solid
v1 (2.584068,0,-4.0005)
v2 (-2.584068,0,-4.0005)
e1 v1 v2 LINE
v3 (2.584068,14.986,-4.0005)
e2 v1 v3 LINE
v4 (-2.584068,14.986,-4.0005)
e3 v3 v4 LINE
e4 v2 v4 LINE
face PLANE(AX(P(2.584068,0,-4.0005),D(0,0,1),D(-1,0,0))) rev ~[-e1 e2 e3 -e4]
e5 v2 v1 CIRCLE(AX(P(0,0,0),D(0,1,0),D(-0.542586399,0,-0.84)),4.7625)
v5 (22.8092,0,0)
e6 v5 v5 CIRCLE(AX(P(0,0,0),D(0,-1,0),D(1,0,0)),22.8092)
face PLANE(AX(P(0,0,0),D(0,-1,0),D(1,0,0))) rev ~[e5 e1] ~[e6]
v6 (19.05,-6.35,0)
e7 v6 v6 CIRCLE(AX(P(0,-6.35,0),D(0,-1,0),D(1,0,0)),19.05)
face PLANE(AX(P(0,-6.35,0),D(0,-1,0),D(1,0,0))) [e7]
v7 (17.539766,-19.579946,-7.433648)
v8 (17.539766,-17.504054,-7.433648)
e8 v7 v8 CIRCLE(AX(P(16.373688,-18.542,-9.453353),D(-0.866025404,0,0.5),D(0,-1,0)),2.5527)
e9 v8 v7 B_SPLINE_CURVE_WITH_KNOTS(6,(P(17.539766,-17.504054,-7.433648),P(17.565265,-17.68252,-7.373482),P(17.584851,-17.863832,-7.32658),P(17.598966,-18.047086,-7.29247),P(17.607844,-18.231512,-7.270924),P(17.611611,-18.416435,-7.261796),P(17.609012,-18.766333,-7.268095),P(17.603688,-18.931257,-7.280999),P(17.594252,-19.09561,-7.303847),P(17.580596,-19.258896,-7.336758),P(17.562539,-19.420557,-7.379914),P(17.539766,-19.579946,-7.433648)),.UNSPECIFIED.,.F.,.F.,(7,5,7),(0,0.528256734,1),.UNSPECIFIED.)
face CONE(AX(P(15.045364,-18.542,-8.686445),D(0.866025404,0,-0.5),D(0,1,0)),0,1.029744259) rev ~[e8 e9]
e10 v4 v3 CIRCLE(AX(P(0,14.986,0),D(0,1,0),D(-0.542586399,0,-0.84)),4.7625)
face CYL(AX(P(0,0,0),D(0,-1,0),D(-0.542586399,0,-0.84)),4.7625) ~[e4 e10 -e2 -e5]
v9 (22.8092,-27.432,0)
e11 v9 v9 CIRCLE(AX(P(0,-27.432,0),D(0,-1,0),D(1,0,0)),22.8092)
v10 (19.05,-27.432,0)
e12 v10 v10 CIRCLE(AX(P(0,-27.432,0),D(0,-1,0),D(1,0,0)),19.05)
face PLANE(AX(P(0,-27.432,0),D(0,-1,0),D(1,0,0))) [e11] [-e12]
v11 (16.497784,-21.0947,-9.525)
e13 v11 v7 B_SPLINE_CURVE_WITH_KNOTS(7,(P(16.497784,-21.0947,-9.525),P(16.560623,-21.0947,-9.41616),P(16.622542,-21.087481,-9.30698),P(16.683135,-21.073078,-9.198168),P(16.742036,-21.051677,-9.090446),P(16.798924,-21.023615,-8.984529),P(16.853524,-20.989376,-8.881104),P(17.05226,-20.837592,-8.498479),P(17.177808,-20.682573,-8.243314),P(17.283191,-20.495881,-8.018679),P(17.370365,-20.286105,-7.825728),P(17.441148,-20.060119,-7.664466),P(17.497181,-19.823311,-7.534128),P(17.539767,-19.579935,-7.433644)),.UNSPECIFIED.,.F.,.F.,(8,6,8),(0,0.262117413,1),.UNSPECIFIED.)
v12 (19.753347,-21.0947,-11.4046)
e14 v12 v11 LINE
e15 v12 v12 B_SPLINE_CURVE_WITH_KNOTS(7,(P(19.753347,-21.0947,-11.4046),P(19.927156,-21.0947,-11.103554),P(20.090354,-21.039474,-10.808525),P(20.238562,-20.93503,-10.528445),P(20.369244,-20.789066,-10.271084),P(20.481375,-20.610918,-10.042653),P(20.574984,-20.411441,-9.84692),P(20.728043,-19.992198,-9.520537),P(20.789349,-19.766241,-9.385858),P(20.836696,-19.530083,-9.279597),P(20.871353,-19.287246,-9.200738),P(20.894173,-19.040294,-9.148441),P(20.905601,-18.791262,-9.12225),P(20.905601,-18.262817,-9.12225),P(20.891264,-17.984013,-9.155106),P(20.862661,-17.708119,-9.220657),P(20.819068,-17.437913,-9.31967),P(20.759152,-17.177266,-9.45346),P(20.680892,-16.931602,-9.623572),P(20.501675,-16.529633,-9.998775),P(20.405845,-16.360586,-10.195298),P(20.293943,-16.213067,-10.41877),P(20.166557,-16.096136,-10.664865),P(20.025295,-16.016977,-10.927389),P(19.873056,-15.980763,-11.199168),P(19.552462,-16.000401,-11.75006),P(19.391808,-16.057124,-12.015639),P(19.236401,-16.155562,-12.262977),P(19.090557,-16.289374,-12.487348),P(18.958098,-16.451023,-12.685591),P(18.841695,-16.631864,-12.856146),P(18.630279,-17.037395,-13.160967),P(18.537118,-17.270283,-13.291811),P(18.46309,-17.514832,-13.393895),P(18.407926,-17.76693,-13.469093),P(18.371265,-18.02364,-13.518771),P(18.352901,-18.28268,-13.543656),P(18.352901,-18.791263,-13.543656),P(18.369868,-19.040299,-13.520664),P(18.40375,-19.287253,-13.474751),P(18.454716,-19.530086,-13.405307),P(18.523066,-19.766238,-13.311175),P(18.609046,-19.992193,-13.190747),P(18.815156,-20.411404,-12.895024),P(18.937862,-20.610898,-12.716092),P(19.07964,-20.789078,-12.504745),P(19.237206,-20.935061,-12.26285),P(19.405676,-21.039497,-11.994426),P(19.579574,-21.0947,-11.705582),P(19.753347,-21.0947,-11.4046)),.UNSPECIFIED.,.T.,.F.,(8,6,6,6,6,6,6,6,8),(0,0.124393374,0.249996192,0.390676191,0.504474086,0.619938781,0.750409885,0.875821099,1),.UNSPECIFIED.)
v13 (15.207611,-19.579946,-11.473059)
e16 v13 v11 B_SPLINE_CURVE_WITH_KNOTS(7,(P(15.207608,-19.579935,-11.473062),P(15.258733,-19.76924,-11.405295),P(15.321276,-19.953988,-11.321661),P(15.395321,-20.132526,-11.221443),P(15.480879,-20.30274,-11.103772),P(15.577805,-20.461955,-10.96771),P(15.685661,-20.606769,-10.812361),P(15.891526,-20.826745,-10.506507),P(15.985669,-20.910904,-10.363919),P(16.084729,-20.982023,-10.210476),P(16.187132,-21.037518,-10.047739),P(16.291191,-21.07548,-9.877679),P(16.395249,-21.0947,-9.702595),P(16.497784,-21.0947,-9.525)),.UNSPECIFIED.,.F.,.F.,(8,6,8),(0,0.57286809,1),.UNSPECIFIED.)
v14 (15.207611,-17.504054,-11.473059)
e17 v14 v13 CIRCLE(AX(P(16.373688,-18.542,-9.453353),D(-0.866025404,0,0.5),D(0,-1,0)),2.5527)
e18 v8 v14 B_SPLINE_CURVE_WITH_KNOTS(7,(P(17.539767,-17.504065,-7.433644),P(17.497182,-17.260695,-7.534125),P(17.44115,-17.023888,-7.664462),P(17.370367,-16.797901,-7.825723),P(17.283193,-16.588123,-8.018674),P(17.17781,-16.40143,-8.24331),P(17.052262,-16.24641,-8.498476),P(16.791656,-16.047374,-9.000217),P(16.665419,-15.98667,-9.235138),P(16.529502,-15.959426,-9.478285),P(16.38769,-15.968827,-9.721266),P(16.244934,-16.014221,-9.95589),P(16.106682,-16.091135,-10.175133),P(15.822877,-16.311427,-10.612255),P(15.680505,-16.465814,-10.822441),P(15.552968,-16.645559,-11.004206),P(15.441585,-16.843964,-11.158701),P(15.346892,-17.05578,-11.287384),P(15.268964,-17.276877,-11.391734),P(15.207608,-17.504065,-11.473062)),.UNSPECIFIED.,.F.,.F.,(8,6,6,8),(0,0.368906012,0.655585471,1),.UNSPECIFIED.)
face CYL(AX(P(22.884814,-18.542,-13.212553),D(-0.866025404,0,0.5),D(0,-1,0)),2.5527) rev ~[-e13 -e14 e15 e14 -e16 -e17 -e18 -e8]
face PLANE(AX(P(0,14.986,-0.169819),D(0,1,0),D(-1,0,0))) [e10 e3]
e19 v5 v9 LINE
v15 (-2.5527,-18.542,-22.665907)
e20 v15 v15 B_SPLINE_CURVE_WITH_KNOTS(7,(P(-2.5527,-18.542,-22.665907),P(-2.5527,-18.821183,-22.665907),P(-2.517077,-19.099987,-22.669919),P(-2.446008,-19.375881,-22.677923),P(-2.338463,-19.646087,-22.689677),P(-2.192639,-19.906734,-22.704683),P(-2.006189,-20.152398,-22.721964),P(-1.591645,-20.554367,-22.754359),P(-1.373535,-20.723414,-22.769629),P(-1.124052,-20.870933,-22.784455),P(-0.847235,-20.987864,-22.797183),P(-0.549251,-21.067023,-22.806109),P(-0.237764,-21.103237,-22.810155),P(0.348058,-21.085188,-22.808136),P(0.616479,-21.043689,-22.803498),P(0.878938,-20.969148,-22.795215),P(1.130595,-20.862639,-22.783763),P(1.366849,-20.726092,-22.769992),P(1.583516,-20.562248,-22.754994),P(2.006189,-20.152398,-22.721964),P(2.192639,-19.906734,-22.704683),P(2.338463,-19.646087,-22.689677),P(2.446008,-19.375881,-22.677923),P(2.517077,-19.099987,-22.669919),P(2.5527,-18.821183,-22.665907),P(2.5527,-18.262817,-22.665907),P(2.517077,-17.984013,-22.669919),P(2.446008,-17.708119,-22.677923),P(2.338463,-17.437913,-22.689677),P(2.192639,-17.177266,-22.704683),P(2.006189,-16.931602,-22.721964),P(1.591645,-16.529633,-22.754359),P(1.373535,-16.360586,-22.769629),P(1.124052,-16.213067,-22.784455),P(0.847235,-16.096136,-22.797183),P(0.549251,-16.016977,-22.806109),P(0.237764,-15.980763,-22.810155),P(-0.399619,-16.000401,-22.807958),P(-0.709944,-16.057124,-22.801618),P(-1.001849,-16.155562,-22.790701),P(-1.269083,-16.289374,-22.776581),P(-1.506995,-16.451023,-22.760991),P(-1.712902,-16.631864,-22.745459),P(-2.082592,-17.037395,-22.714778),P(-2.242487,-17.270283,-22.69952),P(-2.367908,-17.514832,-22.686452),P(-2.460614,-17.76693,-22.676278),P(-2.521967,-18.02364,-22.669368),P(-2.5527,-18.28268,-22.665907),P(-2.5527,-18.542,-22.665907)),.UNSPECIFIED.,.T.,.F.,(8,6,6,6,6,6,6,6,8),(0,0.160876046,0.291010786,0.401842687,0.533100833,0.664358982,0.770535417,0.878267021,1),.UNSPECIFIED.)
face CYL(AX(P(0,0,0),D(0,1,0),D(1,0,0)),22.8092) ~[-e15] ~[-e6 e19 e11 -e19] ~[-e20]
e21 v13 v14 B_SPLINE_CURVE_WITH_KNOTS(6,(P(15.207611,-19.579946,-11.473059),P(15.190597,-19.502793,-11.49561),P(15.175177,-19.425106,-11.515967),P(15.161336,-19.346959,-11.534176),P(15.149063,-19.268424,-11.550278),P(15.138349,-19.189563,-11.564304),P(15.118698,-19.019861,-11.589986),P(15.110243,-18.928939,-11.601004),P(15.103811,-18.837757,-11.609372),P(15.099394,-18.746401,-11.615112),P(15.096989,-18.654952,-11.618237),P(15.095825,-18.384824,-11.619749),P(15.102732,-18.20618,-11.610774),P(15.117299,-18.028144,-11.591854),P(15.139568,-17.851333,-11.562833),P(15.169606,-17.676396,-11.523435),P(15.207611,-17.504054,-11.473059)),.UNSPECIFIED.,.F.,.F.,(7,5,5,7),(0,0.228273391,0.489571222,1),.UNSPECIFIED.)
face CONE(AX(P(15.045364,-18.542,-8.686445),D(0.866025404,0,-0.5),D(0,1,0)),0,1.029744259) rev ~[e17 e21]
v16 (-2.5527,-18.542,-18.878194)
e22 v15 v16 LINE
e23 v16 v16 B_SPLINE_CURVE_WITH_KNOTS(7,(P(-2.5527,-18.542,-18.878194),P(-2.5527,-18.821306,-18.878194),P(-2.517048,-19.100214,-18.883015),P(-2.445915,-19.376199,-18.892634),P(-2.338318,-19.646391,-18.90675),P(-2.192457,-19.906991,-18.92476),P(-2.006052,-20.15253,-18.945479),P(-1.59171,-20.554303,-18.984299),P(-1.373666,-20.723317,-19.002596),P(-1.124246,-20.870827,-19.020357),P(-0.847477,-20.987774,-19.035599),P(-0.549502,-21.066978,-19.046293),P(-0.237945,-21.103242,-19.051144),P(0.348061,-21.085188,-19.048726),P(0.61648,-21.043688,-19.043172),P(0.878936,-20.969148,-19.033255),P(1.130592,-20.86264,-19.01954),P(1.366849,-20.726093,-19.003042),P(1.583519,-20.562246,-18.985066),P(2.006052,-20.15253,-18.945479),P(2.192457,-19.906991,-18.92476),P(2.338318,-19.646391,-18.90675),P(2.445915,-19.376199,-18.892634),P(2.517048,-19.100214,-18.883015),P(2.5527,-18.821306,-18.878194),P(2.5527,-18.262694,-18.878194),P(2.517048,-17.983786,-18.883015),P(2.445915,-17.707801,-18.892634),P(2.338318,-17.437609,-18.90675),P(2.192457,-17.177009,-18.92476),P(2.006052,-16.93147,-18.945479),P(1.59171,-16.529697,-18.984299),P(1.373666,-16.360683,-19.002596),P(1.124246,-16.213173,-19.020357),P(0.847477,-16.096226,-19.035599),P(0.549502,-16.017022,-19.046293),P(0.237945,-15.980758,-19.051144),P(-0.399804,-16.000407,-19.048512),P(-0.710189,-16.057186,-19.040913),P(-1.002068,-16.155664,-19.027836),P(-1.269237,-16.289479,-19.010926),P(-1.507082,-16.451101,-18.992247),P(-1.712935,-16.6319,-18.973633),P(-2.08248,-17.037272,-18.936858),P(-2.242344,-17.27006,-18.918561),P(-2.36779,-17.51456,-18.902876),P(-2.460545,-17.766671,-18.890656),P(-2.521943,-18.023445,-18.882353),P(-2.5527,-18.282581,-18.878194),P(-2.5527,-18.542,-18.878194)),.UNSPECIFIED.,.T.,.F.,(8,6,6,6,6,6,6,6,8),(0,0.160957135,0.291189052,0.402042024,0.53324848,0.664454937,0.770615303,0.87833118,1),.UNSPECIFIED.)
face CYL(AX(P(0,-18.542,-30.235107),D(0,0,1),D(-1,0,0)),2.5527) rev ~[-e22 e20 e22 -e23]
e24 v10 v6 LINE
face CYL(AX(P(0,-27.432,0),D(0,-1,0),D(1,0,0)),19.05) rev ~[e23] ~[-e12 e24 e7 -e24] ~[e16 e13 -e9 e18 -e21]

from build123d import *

# Parameters (mm, degrees)
F0_R      = 22.8092
F1_DEPTH  = 27.432
F3_DEPTH  = 14.986
F4_R      = 19.05
F5_DEPTH  = 21.082
F8_D      = 5.1054
F8_DEPTH  = 7.5692
F8_START  = 0.1432934
F8_TIP    = 1.5338169022
F12_D     = 5.1054
F12_DEPTH = 3.7592
F12_START = 0.1432934
F12_TIP   = 1.5338169022


with BuildPart() as f1:
    # F0 (on Front) → F1 (new body)
    with BuildSketch(Plane.XZ):
        Circle(F0_R)
    extrude(amount=F1_DEPTH)

    # F2 (on face) → F3 (join)
    with BuildSketch(Plane(origin=(0, 0, 0), x_dir=(-1, 0, 0), z_dir=(0, 1, 0))):
        with BuildLine():
            Line((0, -4.0005), (2.5840677236, -4.0005))
            ThreePointArc((2.5840677236, -4.0005), (0, 4.7625), (-2.5840677236, -4.0005))
            Line((-2.5840677236, -4.0005), (0, -4.0005))
        make_face()
    extrude(amount=F3_DEPTH)

    # F4 (on face) → F5 (cut)
    with BuildSketch(Plane.XZ.offset(27.432)):
        Circle(F4_R)
    extrude(amount=-F5_DEPTH, mode=Mode.SUBTRACT)

    # F8
    # its depths count from where the whole tool has entered the part; down to there all is cleared
    with Locations(Plane(origin=(0, 0, -22.8092), x_dir=(1, 0, 0), z_dir=(0, 0, -1)).offset(-F8_START)):
        with Locations((0, 18.542)):
            Hole(F8_D / 2, depth=F8_DEPTH)
            with Locations((0, 0, -(F8_DEPTH + F8_TIP / 2))):  # 118° drill point
                Cone(0, F8_D / 2, F8_TIP, mode=Mode.SUBTRACT)

    # F12
    # its depths count from where the whole tool has entered the part; down to there all is cleared
    with Locations(Plane(origin=(19.75334664, 0, -11.4046), x_dir=(0, 1, 0), z_dir=(0.8660254038, 0, -0.5)).offset(-F12_START)):
        with Locations((-18.542, 0)):
            Hole(F12_D / 2, depth=F12_DEPTH)
            with Locations((0, 0, -(F12_DEPTH + F12_TIP / 2))):  # 118° drill point
                Cone(0, F12_D / 2, F12_TIP, mode=Mode.SUBTRACT)


solid = f1.part
